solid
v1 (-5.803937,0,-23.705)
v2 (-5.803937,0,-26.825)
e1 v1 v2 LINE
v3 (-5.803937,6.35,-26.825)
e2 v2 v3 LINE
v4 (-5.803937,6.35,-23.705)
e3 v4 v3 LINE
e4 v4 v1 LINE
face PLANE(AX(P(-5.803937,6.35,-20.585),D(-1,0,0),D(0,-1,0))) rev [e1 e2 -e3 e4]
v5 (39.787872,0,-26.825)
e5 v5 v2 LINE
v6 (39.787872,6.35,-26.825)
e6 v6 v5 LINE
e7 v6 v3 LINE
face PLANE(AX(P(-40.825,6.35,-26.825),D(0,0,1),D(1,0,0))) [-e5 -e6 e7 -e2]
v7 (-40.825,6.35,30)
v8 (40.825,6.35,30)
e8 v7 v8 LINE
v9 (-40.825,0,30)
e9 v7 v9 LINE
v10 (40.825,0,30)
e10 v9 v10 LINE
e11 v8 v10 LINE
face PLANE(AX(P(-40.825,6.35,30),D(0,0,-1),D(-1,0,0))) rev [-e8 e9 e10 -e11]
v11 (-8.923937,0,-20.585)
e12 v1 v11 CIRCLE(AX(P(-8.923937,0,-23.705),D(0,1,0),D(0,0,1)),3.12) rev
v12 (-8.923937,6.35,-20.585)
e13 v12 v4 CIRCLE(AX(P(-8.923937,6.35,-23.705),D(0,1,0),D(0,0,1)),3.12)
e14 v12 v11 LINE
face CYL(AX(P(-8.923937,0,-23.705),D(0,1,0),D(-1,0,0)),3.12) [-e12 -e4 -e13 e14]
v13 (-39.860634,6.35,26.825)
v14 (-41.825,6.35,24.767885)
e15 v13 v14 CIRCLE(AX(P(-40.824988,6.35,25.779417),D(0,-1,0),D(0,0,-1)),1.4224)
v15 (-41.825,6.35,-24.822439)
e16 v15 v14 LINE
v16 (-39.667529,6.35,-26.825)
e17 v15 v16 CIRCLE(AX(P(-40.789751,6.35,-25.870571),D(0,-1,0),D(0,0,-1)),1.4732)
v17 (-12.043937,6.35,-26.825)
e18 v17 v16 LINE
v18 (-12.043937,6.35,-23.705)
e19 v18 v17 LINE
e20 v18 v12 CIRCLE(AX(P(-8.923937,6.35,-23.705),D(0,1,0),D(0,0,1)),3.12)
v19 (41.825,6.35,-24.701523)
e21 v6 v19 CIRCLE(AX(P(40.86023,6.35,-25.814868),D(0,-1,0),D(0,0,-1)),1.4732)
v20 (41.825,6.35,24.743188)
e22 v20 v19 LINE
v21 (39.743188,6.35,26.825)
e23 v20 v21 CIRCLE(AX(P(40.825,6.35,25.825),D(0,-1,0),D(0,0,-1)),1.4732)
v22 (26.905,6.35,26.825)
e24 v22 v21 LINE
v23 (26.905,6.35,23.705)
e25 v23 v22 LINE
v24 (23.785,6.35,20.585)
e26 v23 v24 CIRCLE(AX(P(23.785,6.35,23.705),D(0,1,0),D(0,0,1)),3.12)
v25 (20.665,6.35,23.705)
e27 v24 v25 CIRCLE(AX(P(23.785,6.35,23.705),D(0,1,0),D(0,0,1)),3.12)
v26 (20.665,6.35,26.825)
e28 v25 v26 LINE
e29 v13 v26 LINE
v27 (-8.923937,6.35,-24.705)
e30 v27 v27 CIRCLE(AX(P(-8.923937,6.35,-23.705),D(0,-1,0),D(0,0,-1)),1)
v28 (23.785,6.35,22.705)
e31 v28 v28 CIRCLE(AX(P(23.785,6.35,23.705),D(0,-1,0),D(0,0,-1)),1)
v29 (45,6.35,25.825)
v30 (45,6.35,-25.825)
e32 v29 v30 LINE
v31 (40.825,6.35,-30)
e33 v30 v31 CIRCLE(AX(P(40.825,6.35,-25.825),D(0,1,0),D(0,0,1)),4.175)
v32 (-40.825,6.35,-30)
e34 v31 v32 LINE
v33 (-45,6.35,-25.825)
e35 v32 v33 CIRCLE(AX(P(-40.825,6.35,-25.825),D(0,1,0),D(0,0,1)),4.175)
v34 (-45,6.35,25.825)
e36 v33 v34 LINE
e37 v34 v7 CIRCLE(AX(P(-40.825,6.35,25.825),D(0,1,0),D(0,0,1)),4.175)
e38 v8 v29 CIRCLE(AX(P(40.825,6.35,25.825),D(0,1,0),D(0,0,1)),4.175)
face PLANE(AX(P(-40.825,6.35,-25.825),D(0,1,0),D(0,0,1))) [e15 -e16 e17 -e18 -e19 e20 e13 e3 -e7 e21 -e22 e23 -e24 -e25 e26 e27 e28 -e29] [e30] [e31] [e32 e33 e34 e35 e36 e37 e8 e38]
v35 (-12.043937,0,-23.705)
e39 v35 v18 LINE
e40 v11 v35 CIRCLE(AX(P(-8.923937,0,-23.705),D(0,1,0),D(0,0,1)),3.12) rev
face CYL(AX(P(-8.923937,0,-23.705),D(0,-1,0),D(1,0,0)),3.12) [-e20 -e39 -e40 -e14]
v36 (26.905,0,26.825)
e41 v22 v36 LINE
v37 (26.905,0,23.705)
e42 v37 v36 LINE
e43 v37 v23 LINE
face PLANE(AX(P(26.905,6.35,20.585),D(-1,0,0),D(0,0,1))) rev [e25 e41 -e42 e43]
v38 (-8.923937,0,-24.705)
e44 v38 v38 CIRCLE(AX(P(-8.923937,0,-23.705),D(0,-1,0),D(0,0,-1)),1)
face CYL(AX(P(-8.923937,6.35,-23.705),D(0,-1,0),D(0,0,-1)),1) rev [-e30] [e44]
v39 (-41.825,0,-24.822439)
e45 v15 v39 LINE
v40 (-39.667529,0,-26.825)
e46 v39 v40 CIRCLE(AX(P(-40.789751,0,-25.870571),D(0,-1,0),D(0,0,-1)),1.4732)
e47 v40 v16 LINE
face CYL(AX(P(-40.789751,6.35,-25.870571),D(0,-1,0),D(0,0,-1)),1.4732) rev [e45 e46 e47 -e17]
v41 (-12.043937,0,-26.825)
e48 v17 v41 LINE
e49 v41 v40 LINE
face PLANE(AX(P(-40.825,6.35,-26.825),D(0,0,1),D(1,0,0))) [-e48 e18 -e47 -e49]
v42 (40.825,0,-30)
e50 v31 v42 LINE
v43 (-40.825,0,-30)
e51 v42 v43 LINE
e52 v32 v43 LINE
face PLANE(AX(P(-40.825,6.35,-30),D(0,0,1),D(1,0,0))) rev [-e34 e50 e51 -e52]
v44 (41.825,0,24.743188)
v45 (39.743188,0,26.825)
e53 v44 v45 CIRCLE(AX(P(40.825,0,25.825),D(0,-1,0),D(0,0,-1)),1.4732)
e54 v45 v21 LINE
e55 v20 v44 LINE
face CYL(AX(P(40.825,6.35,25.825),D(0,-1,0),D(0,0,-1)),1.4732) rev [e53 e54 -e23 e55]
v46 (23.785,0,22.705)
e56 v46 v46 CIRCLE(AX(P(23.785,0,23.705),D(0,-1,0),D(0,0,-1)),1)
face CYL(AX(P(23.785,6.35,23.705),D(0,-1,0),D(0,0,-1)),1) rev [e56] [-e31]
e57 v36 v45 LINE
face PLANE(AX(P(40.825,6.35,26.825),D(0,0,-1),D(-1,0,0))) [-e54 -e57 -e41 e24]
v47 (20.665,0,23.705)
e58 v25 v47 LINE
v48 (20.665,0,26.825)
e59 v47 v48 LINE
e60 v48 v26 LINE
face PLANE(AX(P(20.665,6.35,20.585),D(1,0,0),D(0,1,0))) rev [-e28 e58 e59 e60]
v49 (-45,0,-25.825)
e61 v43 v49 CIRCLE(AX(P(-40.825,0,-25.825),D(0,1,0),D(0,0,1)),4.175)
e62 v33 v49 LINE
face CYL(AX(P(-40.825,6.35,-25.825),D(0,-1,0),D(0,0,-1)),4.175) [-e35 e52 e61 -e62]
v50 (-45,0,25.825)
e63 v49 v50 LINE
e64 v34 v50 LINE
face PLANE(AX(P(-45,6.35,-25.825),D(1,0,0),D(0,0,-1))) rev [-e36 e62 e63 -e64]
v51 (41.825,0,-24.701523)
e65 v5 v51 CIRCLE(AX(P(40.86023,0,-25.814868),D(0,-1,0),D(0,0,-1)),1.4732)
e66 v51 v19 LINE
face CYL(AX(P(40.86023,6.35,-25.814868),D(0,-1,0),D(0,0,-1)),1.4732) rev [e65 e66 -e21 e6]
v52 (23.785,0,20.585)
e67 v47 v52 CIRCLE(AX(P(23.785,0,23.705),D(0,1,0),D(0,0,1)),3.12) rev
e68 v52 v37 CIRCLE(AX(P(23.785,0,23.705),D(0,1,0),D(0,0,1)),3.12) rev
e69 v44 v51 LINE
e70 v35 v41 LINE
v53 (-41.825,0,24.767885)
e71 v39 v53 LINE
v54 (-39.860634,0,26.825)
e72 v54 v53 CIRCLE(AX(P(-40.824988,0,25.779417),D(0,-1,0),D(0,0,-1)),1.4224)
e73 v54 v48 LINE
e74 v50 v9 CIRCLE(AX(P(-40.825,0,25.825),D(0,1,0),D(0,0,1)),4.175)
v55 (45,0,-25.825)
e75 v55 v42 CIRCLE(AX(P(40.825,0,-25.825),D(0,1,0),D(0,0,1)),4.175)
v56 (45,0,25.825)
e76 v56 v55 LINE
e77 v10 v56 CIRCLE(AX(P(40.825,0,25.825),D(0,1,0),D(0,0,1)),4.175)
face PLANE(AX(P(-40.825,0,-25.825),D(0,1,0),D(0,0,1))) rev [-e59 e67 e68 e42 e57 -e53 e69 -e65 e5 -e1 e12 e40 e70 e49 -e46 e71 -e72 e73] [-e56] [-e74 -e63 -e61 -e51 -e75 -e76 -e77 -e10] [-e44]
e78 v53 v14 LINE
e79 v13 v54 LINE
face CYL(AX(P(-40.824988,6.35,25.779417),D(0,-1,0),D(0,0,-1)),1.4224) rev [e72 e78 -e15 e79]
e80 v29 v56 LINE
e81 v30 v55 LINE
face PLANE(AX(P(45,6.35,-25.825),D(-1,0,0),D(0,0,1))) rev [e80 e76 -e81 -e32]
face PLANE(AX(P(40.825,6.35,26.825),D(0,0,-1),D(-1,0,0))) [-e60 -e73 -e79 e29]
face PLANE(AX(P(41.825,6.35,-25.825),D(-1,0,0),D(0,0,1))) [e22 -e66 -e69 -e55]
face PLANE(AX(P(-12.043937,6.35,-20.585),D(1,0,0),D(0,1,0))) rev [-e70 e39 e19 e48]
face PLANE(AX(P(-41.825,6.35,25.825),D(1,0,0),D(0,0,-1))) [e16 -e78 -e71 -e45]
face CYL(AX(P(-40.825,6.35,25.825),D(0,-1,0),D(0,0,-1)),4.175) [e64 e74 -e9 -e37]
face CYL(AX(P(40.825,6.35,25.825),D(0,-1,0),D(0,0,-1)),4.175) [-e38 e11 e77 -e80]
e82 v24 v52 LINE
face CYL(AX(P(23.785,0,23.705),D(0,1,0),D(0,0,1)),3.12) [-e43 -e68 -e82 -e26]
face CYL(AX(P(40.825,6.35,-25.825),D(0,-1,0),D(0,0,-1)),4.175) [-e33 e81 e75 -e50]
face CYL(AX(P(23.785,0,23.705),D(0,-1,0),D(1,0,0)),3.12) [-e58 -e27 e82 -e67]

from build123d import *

# Parameters (mm, degrees)
BOSS_EXTRUDE3_DEPTH = 6.35
SKETCH3_W           = 6.24
SKETCH3_H           = 6.35
BOSS_EXTRUDE4_DEPTH = 6.24
FILLET1_R           = 3.12
SKETCH4_R           = 1
CUT_EXTRUDE1_DEPTH  = 55.454774814
SKETCH5_R           = 1.4224
SKETCH5_R_2         = 1.4732
CUT_EXTRUDE2_DEPTH  = 55.454774814
SKETCH6_W           = 6.24
SKETCH6_H           = 6.35
BOSS_EXTRUDE5_DEPTH = 6.24
SKETCH7_R           = 1
CUT_EXTRUDE3_DEPTH  = 55.454774814
FILLET3_R           = 3.12


with BuildPart() as part:
    # Sketch2 → Boss-Extrude3 (new body)
    with BuildSketch(Plane(origin=(0, 0, 0), x_dir=(1, 0, 0), z_dir=(0, 1, 0))):
        with BuildLine():
            Line((-45, 25.825), (-45, -25.825))
            ThreePointArc((-45, -25.825), (-43.777170811, -28.777170811), (-40.825, -30))
            Line((-40.825, -30), (40.825, -30))
            ThreePointArc((40.825, -30), (43.777170811, -28.777170811), (45, -25.825))
            Line((45, -25.825), (45, 25.825))
            ThreePointArc((45, 25.825), (43.777170811, 28.777170811), (40.825, 30))
            Line((40.825, 30), (-40.825, 30))
            ThreePointArc((-40.825, 30), (-43.777170811, 28.777170811), (-45, 25.825))
        make_face()
        with BuildLine():
            Line((-41.825, -25.825), (-41.825, 25.825))
            ThreePointArc((-41.825, 25.825), (-41.532106781, 26.532106781), (-40.825, 26.825))
            Line((-40.825, 26.825), (40.825, 26.825))
            ThreePointArc((40.825, 26.825), (41.532106781, 26.532106781), (41.825, 25.825))
            Line((41.825, 25.825), (41.825, -25.825))
            ThreePointArc((41.825, -25.825), (41.532106781, -26.532106781), (40.825, -26.825))
            Line((40.825, -26.825), (-40.825, -26.825))
            ThreePointArc((-40.825, -26.825), (-41.532106781, -26.532106781), (-41.825, -25.825))
        make_face(mode=Mode.SUBTRACT)
    extrude(amount=BOSS_EXTRUDE3_DEPTH)

    # Sketch3 → Boss-Extrude4 (add)
    with BuildSketch(Plane(origin=(-7.875425543, 0, 26.825), x_dir=(-1, 0, 0), z_dir=(0, 0, -1))):
        with Locations((-31.660425543, 3.175)):
            Rectangle(SKETCH3_W, SKETCH3_H)
    extrude(amount=BOSS_EXTRUDE4_DEPTH)

    # Fillet1
    fillet1_edges = [part.edges().sort_by_distance(p)[0] for p in [
        (20.665, 3.175, 20.585),
        (26.905, 3.175, 20.585),
    ]]
    fillet(fillet1_edges, radius=FILLET1_R - 0.0001)  # a hair under: the kernel refuses the full size

    # Sketch4 → Cut-Extrude1 (cut, through all)
    with BuildSketch(Plane.XZ):
        with Locations(Location((23.785, 23.705, 0), (0, 0, 270))):
            Circle(SKETCH4_R)
    extrude(amount=-CUT_EXTRUDE1_DEPTH, mode=Mode.SUBTRACT)

    # Sketch5 → Cut-Extrude2 (cut, through all)
    with BuildSketch(Plane.XZ):
        with Locations((-40.824987904, 25.779417466)):
            Circle(SKETCH5_R)
        with Locations((40.825, 25.825)):
            Circle(SKETCH5_R_2)
        with Locations((40.86022953, -25.814867613)):
            Circle(SKETCH5_R_2)
        with Locations((-40.789751469, -25.870570514)):
            Circle(SKETCH5_R_2)
    extrude(amount=-CUT_EXTRUDE2_DEPTH, mode=Mode.SUBTRACT)

    # Sketch6 → Boss-Extrude5 (add)
    with BuildSketch(Plane.XY.offset(-26.825)):
        with Locations((-8.92393673, 3.175)):
            Rectangle(SKETCH6_W, SKETCH6_H)
    extrude(amount=BOSS_EXTRUDE5_DEPTH)

    # Sketch7 → Cut-Extrude3 (cut, through all)
    with BuildSketch(Plane(origin=(0, 0, 0), x_dir=(-1, 0, 0), z_dir=(0, -1, 0))):
        with Locations(Location((8.92393673, 23.705, 0), (0, 0, 90))):
            Circle(SKETCH7_R)
    extrude(amount=-CUT_EXTRUDE3_DEPTH, mode=Mode.SUBTRACT)

    # Fillet3
    fillet3_edges = [part.edges().sort_by_distance(p)[0] for p in [
        (-5.80393673, 3.175, -20.585),
        (-12.04393673, 3.175, -20.585),
    ]]
    fillet(fillet3_edges, radius=FILLET3_R - 0.0001)  # a hair under: the kernel refuses the full size


solid = part.part
